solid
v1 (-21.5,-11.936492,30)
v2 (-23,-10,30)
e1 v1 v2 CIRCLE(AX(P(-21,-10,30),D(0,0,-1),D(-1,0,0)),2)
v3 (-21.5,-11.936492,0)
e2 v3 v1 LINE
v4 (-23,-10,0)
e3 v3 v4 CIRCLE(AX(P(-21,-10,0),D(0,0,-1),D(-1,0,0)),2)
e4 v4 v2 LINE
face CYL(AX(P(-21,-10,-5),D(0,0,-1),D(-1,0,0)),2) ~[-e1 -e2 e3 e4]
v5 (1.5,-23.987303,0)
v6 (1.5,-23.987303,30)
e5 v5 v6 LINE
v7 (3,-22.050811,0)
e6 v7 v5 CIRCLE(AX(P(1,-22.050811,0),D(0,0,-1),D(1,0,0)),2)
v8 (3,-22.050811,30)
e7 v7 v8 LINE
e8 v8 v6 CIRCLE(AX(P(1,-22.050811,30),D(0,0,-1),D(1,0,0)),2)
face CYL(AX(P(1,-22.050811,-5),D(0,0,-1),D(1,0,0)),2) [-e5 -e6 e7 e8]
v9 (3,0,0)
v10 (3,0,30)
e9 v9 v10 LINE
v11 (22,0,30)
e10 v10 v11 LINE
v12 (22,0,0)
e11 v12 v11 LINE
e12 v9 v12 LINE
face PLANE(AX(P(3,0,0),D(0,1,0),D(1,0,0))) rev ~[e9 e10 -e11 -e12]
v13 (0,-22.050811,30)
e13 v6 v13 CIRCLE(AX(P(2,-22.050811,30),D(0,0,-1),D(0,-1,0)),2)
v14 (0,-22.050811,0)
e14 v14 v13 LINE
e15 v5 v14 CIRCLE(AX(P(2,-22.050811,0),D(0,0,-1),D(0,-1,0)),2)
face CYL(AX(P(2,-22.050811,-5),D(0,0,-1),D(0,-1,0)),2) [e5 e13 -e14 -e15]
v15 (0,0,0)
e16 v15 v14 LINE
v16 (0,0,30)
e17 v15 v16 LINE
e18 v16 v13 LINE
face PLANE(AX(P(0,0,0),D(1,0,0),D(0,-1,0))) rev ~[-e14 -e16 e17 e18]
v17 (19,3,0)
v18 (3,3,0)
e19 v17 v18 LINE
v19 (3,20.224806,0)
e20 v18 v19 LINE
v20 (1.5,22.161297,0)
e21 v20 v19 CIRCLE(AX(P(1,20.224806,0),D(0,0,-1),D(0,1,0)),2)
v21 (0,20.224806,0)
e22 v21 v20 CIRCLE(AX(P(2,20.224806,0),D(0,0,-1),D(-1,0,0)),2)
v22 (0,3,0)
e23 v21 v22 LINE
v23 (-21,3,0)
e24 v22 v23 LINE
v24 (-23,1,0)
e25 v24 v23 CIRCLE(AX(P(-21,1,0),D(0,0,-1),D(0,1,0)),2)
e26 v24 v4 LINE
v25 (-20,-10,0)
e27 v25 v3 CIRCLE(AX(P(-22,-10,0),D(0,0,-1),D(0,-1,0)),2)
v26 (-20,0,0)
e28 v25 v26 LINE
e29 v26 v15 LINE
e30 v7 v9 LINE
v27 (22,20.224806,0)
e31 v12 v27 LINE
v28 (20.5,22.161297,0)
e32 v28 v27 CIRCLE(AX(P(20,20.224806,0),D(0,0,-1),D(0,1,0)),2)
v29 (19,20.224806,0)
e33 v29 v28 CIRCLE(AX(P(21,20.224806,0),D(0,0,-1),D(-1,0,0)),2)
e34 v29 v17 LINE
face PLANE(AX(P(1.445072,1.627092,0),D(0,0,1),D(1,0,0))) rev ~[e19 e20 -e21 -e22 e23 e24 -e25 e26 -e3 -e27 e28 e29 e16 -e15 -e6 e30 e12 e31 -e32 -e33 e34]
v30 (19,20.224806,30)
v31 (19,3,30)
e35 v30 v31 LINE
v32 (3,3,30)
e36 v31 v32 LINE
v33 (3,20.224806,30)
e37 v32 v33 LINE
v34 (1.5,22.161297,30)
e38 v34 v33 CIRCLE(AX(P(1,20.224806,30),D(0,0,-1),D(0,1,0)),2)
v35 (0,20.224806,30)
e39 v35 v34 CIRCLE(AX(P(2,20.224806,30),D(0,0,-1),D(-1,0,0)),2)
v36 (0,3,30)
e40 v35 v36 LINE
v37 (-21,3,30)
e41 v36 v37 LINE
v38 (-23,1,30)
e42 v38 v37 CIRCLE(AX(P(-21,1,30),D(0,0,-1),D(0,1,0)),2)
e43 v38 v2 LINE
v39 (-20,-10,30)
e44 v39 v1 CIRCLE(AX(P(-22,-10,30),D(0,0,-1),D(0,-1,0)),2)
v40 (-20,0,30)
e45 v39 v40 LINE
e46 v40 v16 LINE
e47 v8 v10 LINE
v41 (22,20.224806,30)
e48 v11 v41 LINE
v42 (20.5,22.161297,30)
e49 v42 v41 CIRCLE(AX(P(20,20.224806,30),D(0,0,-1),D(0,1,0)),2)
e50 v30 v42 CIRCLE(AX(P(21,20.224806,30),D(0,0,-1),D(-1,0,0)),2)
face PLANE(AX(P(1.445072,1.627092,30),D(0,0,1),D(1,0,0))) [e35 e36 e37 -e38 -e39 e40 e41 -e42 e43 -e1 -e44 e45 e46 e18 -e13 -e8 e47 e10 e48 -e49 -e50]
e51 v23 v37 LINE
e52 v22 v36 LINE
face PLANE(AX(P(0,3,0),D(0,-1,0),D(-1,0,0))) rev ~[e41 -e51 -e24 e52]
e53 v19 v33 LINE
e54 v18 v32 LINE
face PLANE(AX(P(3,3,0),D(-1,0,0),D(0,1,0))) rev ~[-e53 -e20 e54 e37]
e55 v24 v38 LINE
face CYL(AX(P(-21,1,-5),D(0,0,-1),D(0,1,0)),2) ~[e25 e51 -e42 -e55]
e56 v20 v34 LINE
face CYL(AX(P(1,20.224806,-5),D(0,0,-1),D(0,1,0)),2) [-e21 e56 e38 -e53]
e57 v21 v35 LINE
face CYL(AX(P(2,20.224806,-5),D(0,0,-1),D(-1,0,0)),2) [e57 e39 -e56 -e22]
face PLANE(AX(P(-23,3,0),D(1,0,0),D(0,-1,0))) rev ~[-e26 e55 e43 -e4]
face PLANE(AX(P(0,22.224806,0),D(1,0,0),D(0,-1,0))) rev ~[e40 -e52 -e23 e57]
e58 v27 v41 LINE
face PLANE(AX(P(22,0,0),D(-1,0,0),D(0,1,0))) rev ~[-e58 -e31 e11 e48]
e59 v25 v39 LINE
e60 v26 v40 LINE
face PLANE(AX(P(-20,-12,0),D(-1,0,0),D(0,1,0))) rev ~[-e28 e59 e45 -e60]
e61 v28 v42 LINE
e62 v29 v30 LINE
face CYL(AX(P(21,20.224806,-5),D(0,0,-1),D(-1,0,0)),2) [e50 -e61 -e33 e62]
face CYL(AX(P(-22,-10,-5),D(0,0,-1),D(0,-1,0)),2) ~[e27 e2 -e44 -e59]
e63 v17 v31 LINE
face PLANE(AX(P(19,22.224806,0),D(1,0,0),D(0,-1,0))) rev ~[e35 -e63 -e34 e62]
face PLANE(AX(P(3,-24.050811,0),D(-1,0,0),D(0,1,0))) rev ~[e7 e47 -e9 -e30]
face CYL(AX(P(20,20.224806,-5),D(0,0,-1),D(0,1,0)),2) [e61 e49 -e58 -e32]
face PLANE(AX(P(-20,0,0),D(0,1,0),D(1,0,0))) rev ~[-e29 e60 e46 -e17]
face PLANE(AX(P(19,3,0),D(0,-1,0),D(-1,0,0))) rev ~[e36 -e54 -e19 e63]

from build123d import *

# Parameters (mm, degrees)
F1_DEPTH    = 30
F2_T1_DEPTH = 40
F3_T1_DEPTH = 40
F4_T1_DEPTH = 40


# Not quite as in the source:
# - a fillet or chamfer that OpenCascade refuses, or shapes differently, is made with other operations: its cross-section is extruded or revolved along the edge and cut away or added


with BuildPart() as f1:
    # F0 (on Top) → F1 (new body)
    with BuildSketch(Plane.XY):
        Polygon((-20, 3), (-23, 3), (-23, -12), (-20, -12), (-20, 0), (0, 0), (0, -12), (0, -24.0508113056), (3, -24.0508113056), (3, -12), (3, 0), (19, 0), (22, 0), (22, 22.2248057965), (19, 22.2248057965), (19, 3), (3, 3), (3, 22.2248057965), (0, 22.2248057965), (0, 3), align=None)
    extrude(amount=F1_DEPTH)

    # F2: fillet of radius 2 on 2 edges, made by hand

    # F2_s2 → F2_t1 (cut)
    with BuildSketch(Plane.XY.offset(-5)):
        with BuildLine():
            ThreePointArc((2, -24.0508113056), (0.5857864376, -23.465024868), (0, -22.0508113056))
            Line((0, -22.0508113056), (0, -24.0508113056))
            Line((0, -24.0508113056), (2, -24.0508113056))
        make_face()
        with BuildLine():
            ThreePointArc((3, -22.0508113056), (2.4142135624, -23.465024868), (1, -24.0508113056))
            Line((1, -24.0508113056), (3, -24.0508113056))
            Line((3, -24.0508113056), (3, -22.0508113056))
        make_face()
    extrude(amount=F2_T1_DEPTH, mode=Mode.SUBTRACT)

    # F3: fillet of radius 2 on 2 edges, made by hand

    # F3_s2 → F3_t1 (cut)
    with BuildSketch(Plane.XY.offset(-5)):
        with BuildLine():
            ThreePointArc((-23, -10), (-22.4142135624, -11.4142135624), (-21, -12))
            Line((-21, -12), (-23, -12))
            Line((-23, -12), (-23, -10))
        make_face()
        with BuildLine():
            ThreePointArc((-22, -12), (-20.5857864376, -11.4142135624), (-20, -10))
            Line((-20, -10), (-20, -12))
            Line((-20, -12), (-22, -12))
        make_face()
    extrude(amount=F3_T1_DEPTH, mode=Mode.SUBTRACT)

    # F4: fillet of radius 2 on 5 edges, made by hand

    # F4_s2 → F4_t1 (cut)
    with BuildSketch(Plane.XY.offset(-5)):
        with BuildLine():
            ThreePointArc((-21, 3), (-22.4142135624, 2.4142135624), (-23, 1))
            Line((-23, 1), (-23, 3))
            Line((-23, 3), (-21, 3))
        make_face()
        with BuildLine():
            ThreePointArc((0, 20.2248057965), (0.5857864376, 21.6390193588), (2, 22.2248057965))
            Line((2, 22.2248057965), (0, 22.2248057965))
            Line((0, 22.2248057965), (0, 20.2248057965))
        make_face()
        with BuildLine():
            ThreePointArc((19, 20.2248057965), (19.5857864376, 21.6390193588), (21, 22.2248057965))
            Line((21, 22.2248057965), (19, 22.2248057965))
            Line((19, 22.2248057965), (19, 20.2248057965))
        make_face()
        with BuildLine():
            ThreePointArc((1, 22.2248057965), (2.4142135624, 21.6390193588), (3, 20.2248057965))
            Line((3, 20.2248057965), (3, 22.2248057965))
            Line((3, 22.2248057965), (1, 22.2248057965))
        make_face()
        with BuildLine():
            ThreePointArc((20, 22.2248057965), (21.4142135624, 21.6390193588), (22, 20.2248057965))
            Line((22, 20.2248057965), (22, 22.2248057965))
            Line((22, 22.2248057965), (20, 22.2248057965))
        make_face()
    extrude(amount=F4_T1_DEPTH, mode=Mode.SUBTRACT)


solid = f1.part
